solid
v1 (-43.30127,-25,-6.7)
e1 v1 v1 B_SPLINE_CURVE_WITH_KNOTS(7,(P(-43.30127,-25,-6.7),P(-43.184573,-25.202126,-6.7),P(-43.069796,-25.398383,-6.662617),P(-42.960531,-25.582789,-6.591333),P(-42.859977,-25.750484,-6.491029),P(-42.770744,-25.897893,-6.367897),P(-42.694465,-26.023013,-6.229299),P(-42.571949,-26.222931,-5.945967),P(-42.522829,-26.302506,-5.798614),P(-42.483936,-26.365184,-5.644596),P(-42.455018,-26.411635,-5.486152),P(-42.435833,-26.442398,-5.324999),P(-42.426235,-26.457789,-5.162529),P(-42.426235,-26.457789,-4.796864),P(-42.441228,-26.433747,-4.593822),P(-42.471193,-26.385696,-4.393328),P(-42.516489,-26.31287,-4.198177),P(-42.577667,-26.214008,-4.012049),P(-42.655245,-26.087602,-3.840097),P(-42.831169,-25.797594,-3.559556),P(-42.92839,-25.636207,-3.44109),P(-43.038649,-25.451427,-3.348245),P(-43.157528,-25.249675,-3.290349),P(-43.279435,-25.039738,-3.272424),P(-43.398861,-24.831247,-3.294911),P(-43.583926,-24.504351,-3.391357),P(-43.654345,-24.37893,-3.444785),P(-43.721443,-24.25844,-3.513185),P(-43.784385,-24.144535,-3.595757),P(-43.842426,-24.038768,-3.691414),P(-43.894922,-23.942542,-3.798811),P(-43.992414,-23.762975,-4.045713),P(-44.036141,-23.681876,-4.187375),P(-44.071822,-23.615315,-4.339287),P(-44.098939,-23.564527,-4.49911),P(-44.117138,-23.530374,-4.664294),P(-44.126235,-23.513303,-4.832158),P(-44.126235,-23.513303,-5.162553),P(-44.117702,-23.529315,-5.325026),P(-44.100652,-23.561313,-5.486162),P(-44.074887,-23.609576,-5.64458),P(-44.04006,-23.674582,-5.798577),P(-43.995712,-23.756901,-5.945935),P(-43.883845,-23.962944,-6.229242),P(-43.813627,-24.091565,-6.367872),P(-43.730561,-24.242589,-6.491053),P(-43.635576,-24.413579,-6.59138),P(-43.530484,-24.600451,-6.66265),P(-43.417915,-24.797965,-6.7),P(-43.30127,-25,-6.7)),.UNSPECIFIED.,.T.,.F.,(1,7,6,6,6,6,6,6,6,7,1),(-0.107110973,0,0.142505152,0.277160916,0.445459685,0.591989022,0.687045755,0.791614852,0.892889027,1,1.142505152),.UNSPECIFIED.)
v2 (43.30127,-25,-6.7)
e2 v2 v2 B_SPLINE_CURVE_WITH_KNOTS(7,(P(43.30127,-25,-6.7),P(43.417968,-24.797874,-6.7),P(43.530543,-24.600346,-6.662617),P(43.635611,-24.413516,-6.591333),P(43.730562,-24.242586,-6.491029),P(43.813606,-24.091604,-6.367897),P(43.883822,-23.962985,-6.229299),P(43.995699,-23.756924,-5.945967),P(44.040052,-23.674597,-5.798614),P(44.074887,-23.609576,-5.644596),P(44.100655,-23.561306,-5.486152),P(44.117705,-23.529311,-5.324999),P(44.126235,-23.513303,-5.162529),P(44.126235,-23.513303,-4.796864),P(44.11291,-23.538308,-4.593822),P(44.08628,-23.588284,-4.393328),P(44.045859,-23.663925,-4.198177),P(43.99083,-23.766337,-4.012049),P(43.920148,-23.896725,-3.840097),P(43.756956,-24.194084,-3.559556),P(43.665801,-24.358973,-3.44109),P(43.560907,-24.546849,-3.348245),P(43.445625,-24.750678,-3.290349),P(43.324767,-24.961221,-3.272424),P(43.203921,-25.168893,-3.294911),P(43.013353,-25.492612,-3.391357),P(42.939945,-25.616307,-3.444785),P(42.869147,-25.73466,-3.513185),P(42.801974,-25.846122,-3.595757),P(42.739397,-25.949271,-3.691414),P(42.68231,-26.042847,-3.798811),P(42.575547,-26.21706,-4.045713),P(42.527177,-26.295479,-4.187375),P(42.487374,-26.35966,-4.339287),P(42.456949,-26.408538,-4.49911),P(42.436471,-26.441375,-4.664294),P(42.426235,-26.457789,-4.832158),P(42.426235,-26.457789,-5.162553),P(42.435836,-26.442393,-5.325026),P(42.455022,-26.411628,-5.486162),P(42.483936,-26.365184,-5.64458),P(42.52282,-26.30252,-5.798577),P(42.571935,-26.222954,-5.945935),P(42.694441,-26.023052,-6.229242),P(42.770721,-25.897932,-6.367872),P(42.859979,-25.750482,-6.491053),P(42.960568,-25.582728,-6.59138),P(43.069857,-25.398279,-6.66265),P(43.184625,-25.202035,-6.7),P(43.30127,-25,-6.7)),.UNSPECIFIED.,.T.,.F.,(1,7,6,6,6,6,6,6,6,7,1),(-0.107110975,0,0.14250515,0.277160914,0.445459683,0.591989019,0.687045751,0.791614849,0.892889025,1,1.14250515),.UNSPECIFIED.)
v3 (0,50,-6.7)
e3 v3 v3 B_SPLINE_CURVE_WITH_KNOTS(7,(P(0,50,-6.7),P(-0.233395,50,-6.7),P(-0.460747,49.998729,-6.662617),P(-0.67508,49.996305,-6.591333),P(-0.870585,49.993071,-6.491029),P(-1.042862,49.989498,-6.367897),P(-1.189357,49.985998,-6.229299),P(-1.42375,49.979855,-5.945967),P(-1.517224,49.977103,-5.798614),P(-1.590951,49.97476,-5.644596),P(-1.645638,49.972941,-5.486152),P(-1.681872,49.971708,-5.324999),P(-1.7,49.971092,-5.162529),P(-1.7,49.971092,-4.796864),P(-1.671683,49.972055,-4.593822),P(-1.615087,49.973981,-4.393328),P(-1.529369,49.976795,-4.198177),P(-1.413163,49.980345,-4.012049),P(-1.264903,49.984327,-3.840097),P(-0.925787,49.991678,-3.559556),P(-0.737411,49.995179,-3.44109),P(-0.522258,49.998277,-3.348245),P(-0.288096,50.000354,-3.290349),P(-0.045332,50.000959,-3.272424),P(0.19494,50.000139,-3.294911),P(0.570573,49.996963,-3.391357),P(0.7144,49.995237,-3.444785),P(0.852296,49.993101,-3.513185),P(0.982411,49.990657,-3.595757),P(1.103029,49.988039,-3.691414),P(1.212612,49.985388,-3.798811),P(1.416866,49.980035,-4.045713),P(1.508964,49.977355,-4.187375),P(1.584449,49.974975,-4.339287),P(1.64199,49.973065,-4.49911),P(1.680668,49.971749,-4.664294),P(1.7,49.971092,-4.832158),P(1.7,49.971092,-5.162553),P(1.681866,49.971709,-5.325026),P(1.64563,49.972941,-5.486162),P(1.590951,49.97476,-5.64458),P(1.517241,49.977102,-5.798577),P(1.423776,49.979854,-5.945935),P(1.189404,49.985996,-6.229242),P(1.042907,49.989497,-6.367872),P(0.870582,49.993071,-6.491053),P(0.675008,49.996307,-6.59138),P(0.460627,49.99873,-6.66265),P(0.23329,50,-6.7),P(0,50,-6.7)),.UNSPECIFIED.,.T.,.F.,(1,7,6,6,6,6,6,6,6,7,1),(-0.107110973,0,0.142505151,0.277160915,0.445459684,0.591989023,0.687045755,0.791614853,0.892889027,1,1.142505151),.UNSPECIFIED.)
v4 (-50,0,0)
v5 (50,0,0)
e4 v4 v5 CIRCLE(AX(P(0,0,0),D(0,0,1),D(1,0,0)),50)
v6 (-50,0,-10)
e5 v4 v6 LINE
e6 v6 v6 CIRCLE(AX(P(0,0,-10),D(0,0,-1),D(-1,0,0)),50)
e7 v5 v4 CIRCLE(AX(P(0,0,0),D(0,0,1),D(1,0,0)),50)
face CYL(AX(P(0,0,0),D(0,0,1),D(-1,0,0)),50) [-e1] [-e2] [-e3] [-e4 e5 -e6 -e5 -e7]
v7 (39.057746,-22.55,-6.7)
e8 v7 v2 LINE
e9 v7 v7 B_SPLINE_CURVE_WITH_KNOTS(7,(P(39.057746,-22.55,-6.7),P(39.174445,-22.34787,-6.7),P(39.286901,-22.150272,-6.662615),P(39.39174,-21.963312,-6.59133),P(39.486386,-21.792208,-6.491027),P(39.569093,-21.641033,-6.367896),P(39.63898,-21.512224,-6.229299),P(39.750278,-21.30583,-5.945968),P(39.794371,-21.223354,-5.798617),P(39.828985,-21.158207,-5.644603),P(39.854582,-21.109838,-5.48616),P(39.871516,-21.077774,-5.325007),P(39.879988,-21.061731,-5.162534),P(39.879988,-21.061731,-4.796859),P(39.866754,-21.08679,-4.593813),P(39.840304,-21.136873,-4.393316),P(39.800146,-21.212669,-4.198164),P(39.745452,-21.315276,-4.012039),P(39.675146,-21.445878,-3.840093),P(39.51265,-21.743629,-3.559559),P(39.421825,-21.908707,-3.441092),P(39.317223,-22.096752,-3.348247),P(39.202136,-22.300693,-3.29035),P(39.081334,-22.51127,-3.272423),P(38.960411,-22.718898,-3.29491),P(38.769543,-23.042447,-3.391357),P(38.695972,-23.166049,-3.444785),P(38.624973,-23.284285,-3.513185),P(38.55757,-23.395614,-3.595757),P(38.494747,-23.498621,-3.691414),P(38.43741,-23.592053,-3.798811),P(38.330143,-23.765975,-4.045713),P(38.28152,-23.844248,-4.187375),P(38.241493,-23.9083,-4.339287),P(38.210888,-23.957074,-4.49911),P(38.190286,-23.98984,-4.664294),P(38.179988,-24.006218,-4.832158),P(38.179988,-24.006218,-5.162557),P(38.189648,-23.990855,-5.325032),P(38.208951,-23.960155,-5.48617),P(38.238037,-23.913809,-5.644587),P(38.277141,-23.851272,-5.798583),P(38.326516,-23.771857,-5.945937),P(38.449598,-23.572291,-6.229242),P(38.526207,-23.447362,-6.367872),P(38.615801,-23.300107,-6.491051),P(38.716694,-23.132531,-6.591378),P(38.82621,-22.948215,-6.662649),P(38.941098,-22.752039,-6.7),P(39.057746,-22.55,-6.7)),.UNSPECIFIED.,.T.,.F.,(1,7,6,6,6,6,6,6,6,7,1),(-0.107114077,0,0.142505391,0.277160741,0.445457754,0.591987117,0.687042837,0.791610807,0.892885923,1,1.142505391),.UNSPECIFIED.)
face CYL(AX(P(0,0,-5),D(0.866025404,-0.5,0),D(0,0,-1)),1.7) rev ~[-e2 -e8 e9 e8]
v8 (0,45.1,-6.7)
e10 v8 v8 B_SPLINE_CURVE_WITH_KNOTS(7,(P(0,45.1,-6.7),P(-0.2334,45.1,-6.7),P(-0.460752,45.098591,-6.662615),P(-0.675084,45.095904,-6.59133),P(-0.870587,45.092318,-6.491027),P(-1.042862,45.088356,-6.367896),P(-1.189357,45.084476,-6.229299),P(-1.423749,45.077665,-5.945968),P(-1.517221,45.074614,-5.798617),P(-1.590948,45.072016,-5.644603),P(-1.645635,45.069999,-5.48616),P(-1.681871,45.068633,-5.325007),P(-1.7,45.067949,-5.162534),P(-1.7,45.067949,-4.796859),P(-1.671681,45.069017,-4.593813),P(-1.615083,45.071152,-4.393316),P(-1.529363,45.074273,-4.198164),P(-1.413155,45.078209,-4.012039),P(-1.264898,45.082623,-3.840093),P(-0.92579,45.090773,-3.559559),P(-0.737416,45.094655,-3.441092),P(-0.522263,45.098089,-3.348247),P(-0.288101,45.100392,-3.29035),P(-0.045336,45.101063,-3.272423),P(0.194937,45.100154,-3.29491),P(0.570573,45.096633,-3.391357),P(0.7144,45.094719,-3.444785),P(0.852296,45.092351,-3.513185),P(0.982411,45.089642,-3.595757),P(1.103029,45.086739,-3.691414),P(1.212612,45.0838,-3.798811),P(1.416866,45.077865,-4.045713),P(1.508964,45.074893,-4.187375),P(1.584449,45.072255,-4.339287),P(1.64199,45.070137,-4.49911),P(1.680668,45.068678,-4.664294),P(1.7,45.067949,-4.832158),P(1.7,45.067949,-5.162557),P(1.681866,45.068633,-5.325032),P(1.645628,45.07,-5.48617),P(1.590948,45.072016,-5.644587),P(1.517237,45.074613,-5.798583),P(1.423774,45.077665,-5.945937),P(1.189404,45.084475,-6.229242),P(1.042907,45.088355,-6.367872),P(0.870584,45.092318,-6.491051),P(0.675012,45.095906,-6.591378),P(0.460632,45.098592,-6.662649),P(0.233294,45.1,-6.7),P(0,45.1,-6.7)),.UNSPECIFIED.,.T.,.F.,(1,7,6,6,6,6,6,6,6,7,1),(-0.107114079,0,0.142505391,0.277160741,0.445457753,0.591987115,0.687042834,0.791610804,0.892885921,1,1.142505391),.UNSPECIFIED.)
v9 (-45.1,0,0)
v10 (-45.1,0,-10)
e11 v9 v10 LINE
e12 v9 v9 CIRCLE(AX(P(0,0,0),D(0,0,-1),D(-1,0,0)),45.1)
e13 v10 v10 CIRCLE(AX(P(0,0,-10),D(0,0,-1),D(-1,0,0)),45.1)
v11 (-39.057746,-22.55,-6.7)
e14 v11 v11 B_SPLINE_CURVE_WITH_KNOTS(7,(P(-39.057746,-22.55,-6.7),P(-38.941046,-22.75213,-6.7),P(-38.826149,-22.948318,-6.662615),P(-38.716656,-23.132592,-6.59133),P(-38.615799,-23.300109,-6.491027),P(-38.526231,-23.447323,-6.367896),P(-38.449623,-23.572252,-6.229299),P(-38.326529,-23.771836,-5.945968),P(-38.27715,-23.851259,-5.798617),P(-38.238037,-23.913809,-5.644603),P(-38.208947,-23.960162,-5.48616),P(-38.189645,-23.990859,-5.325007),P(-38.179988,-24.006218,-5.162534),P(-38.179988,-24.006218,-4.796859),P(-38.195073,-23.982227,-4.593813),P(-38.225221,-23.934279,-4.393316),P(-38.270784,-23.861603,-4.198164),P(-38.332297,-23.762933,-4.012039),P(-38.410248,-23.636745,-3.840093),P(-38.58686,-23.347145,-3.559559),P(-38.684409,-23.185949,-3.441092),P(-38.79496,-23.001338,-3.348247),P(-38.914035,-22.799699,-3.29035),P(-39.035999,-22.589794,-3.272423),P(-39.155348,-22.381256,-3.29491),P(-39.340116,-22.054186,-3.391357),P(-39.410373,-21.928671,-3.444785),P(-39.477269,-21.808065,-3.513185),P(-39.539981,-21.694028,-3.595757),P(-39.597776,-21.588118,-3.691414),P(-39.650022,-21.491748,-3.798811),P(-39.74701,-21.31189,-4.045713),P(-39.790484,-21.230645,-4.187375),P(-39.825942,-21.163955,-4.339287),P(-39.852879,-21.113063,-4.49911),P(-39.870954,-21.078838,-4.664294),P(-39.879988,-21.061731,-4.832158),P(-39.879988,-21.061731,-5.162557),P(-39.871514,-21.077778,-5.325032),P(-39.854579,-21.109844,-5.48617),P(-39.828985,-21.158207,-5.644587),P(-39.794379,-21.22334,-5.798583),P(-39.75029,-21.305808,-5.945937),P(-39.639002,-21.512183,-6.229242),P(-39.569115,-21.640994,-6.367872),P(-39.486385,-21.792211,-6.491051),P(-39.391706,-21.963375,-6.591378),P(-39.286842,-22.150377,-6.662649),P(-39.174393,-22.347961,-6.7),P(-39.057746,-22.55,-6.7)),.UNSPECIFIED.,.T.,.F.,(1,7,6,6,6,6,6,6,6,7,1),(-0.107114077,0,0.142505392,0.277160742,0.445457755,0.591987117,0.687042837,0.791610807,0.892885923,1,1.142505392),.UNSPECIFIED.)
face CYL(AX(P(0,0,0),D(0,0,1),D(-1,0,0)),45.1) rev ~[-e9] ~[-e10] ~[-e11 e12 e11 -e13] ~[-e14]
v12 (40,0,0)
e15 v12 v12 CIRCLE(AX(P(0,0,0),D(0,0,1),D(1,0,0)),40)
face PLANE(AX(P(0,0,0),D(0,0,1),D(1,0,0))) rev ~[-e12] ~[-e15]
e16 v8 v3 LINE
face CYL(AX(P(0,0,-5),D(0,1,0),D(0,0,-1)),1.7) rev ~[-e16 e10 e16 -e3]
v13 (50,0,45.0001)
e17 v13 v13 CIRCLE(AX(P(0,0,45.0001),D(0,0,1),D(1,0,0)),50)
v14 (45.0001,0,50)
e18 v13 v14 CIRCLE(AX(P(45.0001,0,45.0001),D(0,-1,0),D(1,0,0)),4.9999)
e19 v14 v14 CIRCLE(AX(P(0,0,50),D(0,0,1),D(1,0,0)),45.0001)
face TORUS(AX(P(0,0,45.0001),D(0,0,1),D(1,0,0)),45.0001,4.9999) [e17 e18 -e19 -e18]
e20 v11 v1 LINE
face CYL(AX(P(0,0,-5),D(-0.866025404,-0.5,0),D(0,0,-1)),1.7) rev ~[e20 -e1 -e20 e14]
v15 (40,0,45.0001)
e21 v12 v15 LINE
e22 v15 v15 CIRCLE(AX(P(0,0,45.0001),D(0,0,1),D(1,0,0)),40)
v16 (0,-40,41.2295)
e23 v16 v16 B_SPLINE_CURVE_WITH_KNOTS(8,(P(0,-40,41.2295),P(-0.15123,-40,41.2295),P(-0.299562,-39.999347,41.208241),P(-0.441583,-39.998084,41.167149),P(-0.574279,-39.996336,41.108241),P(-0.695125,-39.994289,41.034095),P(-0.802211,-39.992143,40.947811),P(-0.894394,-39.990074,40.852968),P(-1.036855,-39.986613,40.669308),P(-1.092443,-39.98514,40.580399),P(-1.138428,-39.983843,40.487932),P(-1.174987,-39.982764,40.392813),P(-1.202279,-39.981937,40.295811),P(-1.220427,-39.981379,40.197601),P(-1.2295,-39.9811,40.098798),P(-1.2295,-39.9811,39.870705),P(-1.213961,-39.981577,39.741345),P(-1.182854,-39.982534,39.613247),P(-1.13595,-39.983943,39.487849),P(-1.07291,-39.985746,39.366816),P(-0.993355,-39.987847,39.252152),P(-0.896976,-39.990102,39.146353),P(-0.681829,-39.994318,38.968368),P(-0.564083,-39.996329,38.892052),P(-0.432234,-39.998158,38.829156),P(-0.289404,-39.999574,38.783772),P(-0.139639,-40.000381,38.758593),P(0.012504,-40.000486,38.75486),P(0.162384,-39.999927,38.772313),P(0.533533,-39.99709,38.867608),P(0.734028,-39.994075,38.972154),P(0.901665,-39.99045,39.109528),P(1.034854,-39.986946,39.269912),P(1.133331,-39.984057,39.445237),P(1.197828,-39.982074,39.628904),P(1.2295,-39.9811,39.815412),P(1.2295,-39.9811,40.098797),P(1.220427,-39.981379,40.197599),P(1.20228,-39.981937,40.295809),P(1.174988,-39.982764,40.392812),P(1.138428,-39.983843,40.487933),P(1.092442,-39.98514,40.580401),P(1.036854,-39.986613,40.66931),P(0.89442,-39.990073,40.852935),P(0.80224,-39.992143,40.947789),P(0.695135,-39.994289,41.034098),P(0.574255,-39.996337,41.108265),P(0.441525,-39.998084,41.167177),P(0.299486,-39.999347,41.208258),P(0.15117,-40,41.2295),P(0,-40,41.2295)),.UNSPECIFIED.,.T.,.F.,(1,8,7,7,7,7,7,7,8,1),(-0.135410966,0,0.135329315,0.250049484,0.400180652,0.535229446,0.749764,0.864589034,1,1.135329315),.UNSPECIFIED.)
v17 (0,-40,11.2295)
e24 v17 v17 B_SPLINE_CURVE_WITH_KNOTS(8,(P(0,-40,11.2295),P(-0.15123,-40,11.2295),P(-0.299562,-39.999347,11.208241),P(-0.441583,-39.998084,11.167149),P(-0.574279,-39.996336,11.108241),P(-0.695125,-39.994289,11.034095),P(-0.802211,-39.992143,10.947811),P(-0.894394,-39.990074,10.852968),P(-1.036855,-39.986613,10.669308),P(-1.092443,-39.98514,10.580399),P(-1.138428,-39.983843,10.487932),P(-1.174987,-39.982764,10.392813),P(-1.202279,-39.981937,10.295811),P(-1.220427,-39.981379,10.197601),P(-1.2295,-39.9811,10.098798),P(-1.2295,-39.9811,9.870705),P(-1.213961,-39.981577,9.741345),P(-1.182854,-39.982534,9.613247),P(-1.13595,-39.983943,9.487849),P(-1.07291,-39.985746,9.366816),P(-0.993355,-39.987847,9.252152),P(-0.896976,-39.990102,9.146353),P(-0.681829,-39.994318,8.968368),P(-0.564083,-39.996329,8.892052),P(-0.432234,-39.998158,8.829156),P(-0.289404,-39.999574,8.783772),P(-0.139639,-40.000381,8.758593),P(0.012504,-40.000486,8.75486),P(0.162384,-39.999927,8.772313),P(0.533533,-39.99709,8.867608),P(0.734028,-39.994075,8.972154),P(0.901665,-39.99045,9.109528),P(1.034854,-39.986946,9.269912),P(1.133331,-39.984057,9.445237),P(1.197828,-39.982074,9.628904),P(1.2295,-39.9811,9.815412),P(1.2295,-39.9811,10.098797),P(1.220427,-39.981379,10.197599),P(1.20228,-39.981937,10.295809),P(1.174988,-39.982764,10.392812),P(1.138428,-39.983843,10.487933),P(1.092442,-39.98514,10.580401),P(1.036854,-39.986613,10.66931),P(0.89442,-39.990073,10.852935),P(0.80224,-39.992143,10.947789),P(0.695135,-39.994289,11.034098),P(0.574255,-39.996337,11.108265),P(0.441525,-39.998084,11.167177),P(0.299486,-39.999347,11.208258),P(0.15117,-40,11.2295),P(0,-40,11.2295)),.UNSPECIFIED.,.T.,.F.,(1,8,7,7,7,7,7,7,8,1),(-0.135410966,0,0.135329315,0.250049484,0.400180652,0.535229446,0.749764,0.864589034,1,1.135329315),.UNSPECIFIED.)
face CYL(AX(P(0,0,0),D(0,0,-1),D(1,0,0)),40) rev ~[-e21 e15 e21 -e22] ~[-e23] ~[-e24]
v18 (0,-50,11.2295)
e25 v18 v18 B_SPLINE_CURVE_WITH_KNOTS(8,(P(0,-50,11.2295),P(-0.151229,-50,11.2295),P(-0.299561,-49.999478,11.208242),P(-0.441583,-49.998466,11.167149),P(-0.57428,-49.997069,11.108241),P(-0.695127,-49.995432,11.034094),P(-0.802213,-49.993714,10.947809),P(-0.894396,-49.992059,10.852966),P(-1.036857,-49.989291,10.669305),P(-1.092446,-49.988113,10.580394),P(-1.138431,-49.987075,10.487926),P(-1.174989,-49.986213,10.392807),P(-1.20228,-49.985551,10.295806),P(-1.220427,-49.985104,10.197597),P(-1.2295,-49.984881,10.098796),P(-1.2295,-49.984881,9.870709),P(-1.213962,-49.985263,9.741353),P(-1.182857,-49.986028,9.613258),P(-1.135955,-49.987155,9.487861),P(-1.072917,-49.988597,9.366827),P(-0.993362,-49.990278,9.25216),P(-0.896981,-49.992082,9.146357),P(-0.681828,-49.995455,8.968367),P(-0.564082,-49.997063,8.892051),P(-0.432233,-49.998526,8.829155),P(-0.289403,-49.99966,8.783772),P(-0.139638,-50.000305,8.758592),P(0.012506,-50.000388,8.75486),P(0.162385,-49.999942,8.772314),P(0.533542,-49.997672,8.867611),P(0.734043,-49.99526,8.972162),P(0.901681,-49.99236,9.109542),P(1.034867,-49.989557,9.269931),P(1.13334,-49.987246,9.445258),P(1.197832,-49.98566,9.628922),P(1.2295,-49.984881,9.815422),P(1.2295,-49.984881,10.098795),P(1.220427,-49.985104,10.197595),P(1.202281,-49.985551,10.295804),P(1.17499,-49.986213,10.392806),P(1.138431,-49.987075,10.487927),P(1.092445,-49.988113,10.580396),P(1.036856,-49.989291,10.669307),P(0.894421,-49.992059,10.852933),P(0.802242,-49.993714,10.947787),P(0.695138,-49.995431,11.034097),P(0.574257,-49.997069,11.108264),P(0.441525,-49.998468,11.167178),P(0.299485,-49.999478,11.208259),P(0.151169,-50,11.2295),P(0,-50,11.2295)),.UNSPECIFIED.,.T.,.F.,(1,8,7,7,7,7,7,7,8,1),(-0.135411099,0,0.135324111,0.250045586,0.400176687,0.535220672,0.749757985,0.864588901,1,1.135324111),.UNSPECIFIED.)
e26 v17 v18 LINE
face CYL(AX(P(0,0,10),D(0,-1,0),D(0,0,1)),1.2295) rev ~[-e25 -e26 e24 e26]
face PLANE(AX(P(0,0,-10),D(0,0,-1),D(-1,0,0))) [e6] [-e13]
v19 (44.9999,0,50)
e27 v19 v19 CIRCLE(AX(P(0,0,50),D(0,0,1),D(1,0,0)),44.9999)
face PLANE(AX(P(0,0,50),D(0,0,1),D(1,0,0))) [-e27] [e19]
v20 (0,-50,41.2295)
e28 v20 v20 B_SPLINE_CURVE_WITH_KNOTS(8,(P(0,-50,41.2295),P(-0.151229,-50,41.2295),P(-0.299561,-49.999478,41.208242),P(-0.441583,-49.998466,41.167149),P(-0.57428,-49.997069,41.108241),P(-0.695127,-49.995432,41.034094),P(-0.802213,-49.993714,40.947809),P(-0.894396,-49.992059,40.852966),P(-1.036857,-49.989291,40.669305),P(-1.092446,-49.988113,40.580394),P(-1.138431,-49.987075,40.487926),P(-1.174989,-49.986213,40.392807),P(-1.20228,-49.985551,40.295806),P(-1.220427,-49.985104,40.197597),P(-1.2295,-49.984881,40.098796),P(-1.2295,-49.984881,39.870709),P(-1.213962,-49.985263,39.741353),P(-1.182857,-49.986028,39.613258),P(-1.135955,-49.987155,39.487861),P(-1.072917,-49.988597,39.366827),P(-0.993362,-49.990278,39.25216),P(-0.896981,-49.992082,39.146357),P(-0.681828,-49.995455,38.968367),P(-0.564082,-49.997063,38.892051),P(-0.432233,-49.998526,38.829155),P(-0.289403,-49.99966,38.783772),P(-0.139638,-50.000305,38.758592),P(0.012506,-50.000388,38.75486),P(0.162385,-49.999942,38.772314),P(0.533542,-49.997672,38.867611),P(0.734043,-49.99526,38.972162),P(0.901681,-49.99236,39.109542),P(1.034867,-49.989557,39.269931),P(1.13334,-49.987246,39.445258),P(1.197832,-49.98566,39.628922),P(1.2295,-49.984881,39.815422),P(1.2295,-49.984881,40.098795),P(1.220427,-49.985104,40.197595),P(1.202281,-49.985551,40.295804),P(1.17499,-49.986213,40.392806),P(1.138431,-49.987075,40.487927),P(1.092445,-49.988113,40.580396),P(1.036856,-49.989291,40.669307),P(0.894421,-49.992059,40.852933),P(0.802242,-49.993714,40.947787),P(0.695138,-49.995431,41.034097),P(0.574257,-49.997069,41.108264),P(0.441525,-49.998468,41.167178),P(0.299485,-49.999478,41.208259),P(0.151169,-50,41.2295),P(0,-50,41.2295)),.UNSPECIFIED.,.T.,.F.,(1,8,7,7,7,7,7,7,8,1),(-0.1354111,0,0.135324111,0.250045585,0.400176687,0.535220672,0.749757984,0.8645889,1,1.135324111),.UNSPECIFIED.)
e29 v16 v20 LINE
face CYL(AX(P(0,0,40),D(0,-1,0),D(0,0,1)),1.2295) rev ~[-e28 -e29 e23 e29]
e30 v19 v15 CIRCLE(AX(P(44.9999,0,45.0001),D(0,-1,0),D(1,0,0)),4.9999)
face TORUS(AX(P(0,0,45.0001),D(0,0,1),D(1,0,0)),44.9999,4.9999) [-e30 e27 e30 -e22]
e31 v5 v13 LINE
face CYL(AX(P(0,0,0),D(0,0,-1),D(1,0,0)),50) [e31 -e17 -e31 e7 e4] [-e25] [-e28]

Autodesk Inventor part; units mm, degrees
ref_plane "YZ Plane" through (0, 0, 0) normal (1, 0, 0) x (0, 1, 0)
ref_plane "XZ Plane" through (0, 0, 0) normal (0, 1, 0) x (-1, 0, 0)
ref_plane "XY Plane" through (0, 0, 0) normal (0, 0, 1) x (1, 0, 0)
sketch "Sketch1" plane through (0, 0, 0) normal (0, 0, 1) x (1, 0, 0)
  circle A0 centre (0, 0) radius 40
  circle A1 centre (0, 0) radius 50
  dimension "d0" = 80
  dimension "d1" = 100
extrude "Extrusion1" add sketch "Sketch1" along normal blind 50
sketch "Sketch2" plane through (0, 0, 0) normal (0, 0, -1) x (-1, 0, 0)
  circle A0 centre (0, 0) radius 45.1
  circle A1 centre (0, 0) radius 50 projected
  dimension "d5" = 90.2
extrude "Extrusion2" add sketch "Sketch2" along normal blind 10
sketch "Sketch3" plane through (0, 0, 0) normal (0, 1, 0) x (-1, 0, 0)
  line L0 (-50, -10) -> (50, -10) construction
  point P0 (0, 0)
  point P1 (0, -5)
  dimension "d8" = 5
hole "Hole1" at (0, 0, -5) direction (0, 1, 0) diameter 3.4 end through all clearance for "Socket Head Cap Screw DIN EN ISO 4762" size "M3" standard "DIN"
pattern_circular "Circular Pattern1" count 3 over 360 about axis through (0, 0, -10) along (0, 0, 1) of "Hole1"
fillet "Fillet1" radius 5 2 edges at (-50, 0, 50) (-40, 0, 50)
sketch "Sketch4" plane through (0, 0, 0) normal (0, 1, 0) x (-1, 0, 0)
  point P0 (0, 0)
  point P1 (0, 40)
  point P2 (0, 10)
  dimension "d19" = 10
  dimension "d20" = 40
hole "Hole2" at (0, 0, 40) at (0, 0, 10) direction (0, -1, 0) diameter 2.459 end through all thread size "M3x0.5" class "6H" standard "ANSI Metric M Profile"
properties part number "Nose"
